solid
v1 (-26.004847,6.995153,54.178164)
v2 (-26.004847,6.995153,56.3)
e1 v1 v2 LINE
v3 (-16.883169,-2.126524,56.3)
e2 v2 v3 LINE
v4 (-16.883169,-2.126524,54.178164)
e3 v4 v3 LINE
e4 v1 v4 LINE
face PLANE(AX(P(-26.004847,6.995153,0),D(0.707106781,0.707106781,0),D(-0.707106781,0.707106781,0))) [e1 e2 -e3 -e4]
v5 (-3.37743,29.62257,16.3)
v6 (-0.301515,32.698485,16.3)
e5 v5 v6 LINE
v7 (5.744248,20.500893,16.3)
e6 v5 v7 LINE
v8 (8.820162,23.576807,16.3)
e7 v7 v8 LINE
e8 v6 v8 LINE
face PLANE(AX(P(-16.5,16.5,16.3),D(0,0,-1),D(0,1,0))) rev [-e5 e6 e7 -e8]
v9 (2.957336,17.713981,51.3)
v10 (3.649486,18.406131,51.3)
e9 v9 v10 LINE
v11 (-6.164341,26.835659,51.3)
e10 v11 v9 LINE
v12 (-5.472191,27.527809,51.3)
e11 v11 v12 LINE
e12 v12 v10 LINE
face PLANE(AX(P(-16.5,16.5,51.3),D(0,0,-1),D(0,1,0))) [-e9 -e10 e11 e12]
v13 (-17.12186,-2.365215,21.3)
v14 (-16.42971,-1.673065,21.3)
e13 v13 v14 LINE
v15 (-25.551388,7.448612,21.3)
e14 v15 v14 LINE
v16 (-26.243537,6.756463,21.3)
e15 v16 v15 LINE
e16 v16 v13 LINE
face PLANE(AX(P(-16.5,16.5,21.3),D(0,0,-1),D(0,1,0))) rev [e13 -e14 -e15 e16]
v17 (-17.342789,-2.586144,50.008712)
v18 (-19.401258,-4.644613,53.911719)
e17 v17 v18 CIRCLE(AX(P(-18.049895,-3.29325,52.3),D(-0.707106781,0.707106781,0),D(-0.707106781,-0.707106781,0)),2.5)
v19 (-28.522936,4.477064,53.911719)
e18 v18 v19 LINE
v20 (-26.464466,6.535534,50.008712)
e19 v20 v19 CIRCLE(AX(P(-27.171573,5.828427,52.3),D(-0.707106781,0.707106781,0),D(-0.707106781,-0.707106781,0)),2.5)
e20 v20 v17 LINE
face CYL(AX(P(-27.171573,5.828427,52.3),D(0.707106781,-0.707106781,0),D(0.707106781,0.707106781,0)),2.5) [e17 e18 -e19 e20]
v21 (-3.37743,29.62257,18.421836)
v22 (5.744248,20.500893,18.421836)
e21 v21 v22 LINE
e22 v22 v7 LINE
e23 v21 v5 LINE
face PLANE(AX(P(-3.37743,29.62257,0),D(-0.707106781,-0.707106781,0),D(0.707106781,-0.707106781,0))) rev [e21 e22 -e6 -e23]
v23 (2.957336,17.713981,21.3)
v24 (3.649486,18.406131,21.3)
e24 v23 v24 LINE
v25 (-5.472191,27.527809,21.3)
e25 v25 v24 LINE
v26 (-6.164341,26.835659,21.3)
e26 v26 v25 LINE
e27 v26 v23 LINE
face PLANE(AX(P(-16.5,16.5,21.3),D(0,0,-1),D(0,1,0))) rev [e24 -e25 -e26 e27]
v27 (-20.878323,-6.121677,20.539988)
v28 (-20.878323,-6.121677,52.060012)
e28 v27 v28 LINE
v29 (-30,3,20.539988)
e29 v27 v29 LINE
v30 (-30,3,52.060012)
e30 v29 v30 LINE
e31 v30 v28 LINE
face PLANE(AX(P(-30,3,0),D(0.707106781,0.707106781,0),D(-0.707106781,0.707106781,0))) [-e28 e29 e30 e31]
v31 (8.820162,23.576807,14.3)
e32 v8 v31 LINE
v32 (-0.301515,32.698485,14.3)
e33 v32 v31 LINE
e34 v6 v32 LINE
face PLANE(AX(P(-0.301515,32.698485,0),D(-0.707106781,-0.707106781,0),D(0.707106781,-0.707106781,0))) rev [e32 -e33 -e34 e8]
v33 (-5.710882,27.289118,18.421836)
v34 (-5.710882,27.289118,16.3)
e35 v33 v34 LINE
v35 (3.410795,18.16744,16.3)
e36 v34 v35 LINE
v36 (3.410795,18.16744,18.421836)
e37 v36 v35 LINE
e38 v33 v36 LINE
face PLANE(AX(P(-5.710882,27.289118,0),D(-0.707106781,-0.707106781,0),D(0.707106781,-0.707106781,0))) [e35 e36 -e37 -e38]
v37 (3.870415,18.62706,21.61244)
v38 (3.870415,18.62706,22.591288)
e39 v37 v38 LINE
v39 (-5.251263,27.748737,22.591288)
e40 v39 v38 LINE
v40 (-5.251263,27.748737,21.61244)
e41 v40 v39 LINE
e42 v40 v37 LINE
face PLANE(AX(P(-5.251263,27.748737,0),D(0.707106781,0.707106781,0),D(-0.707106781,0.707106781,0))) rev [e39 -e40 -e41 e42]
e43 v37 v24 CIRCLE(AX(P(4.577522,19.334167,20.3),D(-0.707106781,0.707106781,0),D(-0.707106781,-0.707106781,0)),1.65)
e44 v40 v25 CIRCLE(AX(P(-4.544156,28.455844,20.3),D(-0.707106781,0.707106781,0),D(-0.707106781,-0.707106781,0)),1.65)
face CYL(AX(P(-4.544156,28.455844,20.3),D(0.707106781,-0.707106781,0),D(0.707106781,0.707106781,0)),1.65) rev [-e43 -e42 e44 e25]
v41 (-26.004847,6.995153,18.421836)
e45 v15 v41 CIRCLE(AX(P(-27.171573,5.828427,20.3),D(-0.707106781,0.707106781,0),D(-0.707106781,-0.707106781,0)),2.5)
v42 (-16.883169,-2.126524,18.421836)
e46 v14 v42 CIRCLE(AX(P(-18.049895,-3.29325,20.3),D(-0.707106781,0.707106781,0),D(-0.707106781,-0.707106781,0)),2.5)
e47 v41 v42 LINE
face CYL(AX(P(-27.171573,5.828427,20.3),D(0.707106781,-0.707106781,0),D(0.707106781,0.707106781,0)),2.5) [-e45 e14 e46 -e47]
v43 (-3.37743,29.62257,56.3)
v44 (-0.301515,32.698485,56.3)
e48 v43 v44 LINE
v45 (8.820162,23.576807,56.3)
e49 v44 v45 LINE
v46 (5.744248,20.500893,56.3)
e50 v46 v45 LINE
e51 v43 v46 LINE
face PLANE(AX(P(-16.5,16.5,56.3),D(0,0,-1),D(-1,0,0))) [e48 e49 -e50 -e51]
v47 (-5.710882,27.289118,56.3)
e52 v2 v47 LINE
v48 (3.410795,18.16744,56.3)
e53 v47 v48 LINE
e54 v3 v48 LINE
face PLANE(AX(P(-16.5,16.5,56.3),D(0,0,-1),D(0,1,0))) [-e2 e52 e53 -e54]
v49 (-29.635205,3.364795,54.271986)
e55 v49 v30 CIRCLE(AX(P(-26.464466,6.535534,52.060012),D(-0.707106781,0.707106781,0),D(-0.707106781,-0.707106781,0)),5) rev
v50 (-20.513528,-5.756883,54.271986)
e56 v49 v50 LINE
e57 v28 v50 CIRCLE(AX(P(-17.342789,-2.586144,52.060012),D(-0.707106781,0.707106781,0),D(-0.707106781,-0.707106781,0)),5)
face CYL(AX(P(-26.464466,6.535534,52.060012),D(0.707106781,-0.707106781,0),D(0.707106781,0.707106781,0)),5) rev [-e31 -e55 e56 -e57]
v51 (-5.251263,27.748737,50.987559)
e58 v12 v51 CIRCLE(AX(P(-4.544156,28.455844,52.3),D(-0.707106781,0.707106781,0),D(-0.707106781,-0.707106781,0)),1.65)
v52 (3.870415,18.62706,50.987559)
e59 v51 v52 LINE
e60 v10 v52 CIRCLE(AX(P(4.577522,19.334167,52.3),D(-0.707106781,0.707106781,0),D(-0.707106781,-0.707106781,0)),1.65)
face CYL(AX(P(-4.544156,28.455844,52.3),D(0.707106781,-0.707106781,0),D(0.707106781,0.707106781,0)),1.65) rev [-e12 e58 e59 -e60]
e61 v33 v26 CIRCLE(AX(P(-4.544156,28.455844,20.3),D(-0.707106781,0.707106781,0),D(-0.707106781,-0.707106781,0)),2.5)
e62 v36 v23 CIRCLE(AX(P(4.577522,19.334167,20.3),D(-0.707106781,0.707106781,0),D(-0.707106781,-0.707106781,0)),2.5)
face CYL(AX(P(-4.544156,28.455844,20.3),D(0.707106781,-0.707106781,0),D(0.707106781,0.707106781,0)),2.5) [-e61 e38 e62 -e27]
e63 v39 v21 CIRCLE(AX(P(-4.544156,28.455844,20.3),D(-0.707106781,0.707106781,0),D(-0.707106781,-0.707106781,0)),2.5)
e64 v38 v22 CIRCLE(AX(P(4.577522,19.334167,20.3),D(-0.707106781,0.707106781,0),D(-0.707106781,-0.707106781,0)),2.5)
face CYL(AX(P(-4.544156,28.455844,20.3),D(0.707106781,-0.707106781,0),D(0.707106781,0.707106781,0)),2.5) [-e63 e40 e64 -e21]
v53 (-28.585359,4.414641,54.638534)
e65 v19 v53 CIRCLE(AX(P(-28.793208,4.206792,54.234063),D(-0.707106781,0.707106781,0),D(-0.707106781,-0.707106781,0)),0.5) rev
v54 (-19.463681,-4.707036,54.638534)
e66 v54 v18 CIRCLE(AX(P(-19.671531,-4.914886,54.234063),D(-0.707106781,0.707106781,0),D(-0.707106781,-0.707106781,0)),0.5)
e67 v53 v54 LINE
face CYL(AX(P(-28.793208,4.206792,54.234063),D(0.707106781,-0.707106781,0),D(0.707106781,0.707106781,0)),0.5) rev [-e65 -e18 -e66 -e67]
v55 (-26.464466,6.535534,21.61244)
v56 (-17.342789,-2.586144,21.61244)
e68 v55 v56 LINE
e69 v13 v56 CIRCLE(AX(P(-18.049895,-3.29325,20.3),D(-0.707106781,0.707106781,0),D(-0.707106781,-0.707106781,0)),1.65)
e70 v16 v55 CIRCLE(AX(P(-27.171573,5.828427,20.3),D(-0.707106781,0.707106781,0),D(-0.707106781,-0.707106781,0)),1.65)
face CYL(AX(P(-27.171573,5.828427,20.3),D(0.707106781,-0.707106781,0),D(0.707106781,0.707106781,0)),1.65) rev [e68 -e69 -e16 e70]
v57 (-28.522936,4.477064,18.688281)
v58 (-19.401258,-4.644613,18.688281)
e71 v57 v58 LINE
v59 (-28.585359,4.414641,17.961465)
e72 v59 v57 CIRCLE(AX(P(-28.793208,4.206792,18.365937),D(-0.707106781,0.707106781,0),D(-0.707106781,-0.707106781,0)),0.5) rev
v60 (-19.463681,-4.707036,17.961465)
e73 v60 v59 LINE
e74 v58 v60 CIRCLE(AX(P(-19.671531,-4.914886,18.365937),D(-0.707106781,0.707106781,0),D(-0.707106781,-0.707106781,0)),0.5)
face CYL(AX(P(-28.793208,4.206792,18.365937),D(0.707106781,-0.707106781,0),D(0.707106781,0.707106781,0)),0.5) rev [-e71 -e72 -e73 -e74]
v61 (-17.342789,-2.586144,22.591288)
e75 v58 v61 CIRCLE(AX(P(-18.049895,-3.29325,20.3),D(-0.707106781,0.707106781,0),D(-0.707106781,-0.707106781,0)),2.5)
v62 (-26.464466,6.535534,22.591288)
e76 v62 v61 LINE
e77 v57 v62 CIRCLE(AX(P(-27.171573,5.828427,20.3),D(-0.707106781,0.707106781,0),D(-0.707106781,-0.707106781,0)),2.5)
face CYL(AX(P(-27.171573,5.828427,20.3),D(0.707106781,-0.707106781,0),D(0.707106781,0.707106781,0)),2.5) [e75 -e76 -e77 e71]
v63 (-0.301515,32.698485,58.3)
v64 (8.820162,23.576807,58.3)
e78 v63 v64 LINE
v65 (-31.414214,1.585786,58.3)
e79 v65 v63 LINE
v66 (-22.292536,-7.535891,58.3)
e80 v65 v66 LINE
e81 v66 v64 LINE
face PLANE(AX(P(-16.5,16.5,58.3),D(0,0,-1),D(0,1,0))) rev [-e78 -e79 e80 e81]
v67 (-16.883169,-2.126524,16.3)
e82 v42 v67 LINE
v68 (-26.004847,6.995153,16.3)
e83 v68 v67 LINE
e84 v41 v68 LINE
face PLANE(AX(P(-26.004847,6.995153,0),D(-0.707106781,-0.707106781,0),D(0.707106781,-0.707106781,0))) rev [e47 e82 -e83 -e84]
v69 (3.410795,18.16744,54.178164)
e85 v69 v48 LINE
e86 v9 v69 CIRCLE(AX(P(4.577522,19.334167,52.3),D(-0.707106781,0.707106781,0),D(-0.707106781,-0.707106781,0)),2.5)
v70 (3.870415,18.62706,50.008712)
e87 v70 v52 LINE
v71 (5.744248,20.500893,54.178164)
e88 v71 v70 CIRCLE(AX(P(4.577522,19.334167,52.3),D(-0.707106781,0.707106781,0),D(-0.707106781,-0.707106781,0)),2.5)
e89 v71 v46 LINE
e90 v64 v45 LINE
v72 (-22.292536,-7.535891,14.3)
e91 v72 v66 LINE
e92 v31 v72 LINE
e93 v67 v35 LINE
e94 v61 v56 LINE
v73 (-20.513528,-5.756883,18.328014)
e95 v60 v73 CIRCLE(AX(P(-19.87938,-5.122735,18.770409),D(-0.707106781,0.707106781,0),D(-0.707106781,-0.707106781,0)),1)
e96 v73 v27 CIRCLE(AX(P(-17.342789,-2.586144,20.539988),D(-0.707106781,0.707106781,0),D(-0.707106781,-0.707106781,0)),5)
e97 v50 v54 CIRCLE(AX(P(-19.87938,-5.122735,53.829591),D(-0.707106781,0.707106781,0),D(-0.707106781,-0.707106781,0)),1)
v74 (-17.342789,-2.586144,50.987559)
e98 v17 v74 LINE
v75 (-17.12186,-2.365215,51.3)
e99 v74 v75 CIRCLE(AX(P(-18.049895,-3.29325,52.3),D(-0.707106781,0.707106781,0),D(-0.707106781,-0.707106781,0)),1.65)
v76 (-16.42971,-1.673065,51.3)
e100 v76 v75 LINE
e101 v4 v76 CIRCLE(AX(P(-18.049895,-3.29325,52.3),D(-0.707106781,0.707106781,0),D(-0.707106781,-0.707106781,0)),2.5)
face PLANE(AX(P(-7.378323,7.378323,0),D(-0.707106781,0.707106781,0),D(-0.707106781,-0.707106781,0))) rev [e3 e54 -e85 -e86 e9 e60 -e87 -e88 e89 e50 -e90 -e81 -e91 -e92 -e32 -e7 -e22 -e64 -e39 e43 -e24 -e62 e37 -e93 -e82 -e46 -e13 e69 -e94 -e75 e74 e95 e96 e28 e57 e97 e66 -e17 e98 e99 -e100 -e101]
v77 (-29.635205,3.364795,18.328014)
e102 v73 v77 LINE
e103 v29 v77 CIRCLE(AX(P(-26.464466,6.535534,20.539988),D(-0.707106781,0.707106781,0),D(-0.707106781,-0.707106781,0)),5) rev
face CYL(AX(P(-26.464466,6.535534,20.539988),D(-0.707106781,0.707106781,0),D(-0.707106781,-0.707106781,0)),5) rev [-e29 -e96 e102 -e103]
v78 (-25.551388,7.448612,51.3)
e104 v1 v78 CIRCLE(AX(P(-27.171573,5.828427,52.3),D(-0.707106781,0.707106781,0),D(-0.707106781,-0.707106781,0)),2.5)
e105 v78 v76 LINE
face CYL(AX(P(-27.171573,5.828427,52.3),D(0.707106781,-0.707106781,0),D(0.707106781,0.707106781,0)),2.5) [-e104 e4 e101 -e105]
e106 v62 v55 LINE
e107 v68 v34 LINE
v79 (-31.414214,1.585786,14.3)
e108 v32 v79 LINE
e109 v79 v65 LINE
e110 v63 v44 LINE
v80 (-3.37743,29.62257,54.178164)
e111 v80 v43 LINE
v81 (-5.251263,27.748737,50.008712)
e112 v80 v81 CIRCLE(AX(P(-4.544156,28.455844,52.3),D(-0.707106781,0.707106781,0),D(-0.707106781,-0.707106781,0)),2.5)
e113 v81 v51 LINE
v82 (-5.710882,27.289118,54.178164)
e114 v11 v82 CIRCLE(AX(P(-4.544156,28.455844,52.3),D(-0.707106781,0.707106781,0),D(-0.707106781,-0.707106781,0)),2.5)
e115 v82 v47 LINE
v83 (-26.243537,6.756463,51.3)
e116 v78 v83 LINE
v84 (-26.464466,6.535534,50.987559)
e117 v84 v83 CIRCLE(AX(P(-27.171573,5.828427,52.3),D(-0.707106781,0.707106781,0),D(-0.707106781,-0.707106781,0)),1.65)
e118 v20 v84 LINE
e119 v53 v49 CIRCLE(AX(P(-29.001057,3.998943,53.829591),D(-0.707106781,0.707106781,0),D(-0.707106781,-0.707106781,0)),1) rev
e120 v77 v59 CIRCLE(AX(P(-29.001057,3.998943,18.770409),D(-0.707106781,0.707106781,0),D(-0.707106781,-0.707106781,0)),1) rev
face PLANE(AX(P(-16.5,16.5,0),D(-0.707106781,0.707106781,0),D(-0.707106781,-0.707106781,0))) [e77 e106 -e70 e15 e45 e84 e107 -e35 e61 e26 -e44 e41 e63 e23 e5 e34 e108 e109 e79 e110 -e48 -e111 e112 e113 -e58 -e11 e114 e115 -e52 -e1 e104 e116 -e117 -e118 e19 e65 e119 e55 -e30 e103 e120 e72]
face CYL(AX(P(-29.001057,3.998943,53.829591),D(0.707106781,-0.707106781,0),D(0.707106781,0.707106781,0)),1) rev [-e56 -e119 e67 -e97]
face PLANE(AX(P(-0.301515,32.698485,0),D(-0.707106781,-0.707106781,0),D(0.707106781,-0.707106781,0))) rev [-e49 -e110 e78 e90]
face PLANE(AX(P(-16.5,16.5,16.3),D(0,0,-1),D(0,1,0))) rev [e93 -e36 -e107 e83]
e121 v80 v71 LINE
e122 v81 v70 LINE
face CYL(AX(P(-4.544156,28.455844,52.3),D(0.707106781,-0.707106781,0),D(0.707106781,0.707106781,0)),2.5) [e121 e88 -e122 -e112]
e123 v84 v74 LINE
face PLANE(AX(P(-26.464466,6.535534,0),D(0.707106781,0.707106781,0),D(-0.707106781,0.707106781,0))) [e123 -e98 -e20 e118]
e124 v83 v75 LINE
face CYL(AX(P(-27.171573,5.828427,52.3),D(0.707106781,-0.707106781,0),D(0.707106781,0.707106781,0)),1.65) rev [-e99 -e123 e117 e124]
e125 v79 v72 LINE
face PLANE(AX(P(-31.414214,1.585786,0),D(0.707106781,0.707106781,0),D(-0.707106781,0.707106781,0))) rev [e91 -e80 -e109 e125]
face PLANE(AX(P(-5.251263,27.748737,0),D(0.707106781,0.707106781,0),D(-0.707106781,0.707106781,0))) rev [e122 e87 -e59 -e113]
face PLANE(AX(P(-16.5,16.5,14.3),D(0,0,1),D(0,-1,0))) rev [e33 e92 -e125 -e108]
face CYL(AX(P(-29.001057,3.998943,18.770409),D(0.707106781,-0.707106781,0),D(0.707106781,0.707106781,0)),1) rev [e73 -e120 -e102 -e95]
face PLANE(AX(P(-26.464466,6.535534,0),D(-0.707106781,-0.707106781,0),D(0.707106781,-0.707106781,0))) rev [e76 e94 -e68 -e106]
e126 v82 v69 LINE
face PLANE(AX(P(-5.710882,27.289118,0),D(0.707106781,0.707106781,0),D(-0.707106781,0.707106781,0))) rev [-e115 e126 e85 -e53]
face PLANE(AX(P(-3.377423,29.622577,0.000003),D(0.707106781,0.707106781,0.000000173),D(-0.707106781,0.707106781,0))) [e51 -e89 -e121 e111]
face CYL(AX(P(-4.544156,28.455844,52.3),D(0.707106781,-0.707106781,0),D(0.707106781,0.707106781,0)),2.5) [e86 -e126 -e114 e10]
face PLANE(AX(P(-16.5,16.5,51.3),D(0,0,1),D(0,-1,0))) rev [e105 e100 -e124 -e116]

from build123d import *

# Parameters (mm, degrees)
BOSS_EXTRUDE1_DEPTH = 12.9
FILLET1_R           = 5
FILLET2_R           = 1
FILLET3_R           = 0.5


with BuildPart() as part:
    # Sketch2 → Boss-Extrude1 (new body)
    with BuildSketch(Plane(origin=(-7.378322523, 7.378322523, 0), x_dir=(0, 0, 1), z_dir=(-0.7071067811865452, 0.7071067811865498, 0))):
        with BuildLine():
            Line((56.29999994, -16.741883092), (56.29999994, -19.091883092))
            Line((56.29999994, -19.091883092), (16.29999994, -19.091883092))
            Line((16.29999994, -19.091883092), (16.29999994, -16.741883092))
            Line((16.29999994, -16.741883092), (18.421835943, -16.741883092))
            ThreePointArc((18.421835943, -16.741883092), (21.641004351, -17.201790003), (22.591287788, -14.091883092))
            Line((22.591287788, -14.091883092), (22.29999994, -14.091883092))
            Line((22.29999994, -14.091883092), (21.612440415, -14.091883092))
            ThreePointArc((21.612440415, -14.091883092), (21.863334003, -14.564164788), (21.94999994, -15.091883092))
            ThreePointArc((21.94999994, -15.091883092), (18.821402632, -15.824174018), (21.29999994, -13.779442617))
            Line((21.29999994, -13.779442617), (21.29999994, -13.091883092))
            Line((21.29999994, -13.091883092), (21.29999994, -12.800595245))
            ThreePointArc((21.29999994, -12.800595245), (19.756303769, -12.651720296), (18.421835943, -13.441883092))
            Line((18.421835943, -13.441883092), (16.29999994, -13.441883092))
            Line((16.29999994, -13.441883092), (16.29999994, 15.258116908))
            Line((16.29999994, 15.258116908), (18.421835943, 15.258116908))
            ThreePointArc((18.421835943, 15.258116908), (19.756303769, 14.467954112), (21.29999994, 14.61682906))
            Line((21.29999994, 14.61682906), (21.29999994, 14.908116908))
            Line((21.29999994, 14.908116908), (21.29999994, 15.595676433))
            ThreePointArc((21.29999994, 15.595676433), (18.821402632, 17.640407834), (21.94999994, 16.908116908))
            ThreePointArc((21.94999994, 16.908116908), (21.863334003, 16.380398604), (21.612440415, 15.908116908))
            Line((21.612440415, 15.908116908), (22.29999994, 15.908116908))
            Line((22.29999994, 15.908116908), (22.591287788, 15.908116908))
            ThreePointArc((22.591287788, 15.908116908), (21.641004351, 19.018023818), (18.421835943, 18.558116908))
            Line((18.421835943, 18.558116908), (16.29999994, 18.558116908))
            Line((16.29999994, 18.558116908), (16.29999994, 22.908116908))
            Line((16.29999994, 22.908116908), (14.29999994, 22.908116908))
            Line((14.29999994, 22.908116908), (14.29999994, -21.091883092))
            Line((14.29999994, -21.091883092), (58.29999994, -21.091883092))
            Line((58.29999994, -21.091883092), (58.29999994, 22.908116908))
            Line((58.29999994, 22.908116908), (56.29999994, 22.908116908))
            Line((56.29999994, 22.908116908), (56.29999994, 18.558116541))
            Line((56.29999994, 18.558116541), (54.178163937, 18.558116908))
            ThreePointArc((54.178163937, 18.558116908), (50.95899553, 19.018023818), (50.008712093, 15.908116908))
            Line((50.008712093, 15.908116908), (50.29999994, 15.908116908))
            Line((50.29999994, 15.908116908), (50.987559466, 15.908116908))
            ThreePointArc((50.987559466, 15.908116908), (51.772281637, 18.471450971), (53.94999994, 16.908116908))
            ThreePointArc((53.94999994, 16.908116908), (53.032290866, 15.4295196), (51.29999994, 15.595676433))
            Line((51.29999994, 15.595676433), (51.29999994, 14.908116908))
            Line((51.29999994, 14.908116908), (51.29999994, 14.61682906))
            ThreePointArc((51.29999994, 14.61682906), (52.843696112, 14.467954112), (54.178163937, 15.258116908))
            Line((54.178163937, 15.258116908), (56.29999994, 15.258116908))
            Line((56.29999994, 15.258116908), (56.29999994, -13.441883092))
            Line((56.29999994, -13.441883092), (54.178163937, -13.441883092))
            ThreePointArc((54.178163937, -13.441883092), (52.843696112, -12.651720296), (51.29999994, -12.800595245))
            Line((51.29999994, -12.800595245), (51.29999994, -13.091883092))
            Line((51.29999994, -13.091883092), (51.29999994, -13.779442617))
            ThreePointArc((51.29999994, -13.779442617), (53.032290866, -13.613285784), (53.94999994, -15.091883092))
            ThreePointArc((53.94999994, -15.091883092), (51.772281637, -16.655217155), (50.987559466, -14.091883092))
            Line((50.987559466, -14.091883092), (50.29999994, -14.091883092))
            Line((50.29999994, -14.091883092), (50.008712093, -14.091883092))
            ThreePointArc((50.008712093, -14.091883092), (50.95899553, -17.201790003), (54.178163937, -16.741883092))
            Line((54.178163937, -16.741883092), (56.29999994, -16.741883092))
        make_face()
    extrude(amount=BOSS_EXTRUDE1_DEPTH)

    # Fillet1
    # the kernel refuses this fillet: 5 mm, written as the material it adds along each edge
    with BuildSketch(Plane(origin=(-20.878322523, -6.121677477, 56.29999994), x_dir=(0, 0, -1), z_dir=(-0.7071067811865452, 0.7071067811865498, 0))) as fillet1_piece_1:
        with BuildLine():
            CenterArc((4.239988208, -5), FILLET1_R, 90, 57.994545172)
            Line((0, -2.35), (-0.084799764, -2.297))
            ThreePointArc((-0.084799764, -2.297), (-0.1, -1.175), (-0.1, 0))
            Line((-0.1, 0), (0, 0.1))
            Line((0, 0.1), (4.239988208, 0.1))
            Line((4.239988208, 0.1), (4.239988208, 0))
        make_face()
    extrude(amount=12.9)
    with BuildSketch(Plane(origin=(-20.878322523, -6.121677477, 16.29999994), x_dir=(0.7071067811865498, 0.7071067811865452, 4.67144053935759e-13), z_dir=(-0.7071067811865452, 0.7071067811865498, 0))) as fillet1_piece_2:
        with BuildLine():
            CenterArc((5, -4.239988208), FILLET1_R, 122.005454828, 57.994545172)
            Line((0, -4.239988208), (-0.1, -4.239988208))
            Line((-0.1, -4.239988208), (-0.1, 0))
            Line((-0.1, 0), (0, 0.1))
            ThreePointArc((0, 0.1), (1.175, 0.1), (2.297, 0.084799764))
            Line((2.297, 0.084799764), (2.35, 0))
        make_face()
    extrude(amount=12.9)

    # Fillet2
    # the kernel refuses this fillet: 1 mm, written as the material it adds along each edge
    with BuildSketch(Plane(origin=(-19.216621587, -4.459976542, 16.29999994), x_dir=(-0.4742981469837023, -0.4742981469836992, 0.7416754920689071), z_dir=(-0.7071067811865452, 0.7071067811865498, 0))) as fillet2_piece_1:
        with BuildLine():
            CenterArc((2.460931793, 0.961889952), FILLET2_R, 152.5257211, 133.343162112)
            Line((1.573713762, 1.423240324), (1.555969401, 1.432467331))
            ThreePointArc((1.555969401, 1.432467331), (0.773441703, 0.726453672), (-0.013415177, 0.01483351))
            Line((-0.013415177, 0.01483351), (-0.005468737, -0.019237799))
            ThreePointArc((-0.005468737, -0.019237799), (1.367184329, -0.210550238), (2.739837396, -0.019237799))
            Line((2.739837396, -0.019237799), (2.734368658, 0))
        make_face()
    extrude(amount=12.9)
    with BuildSketch(Plane(origin=(-19.216621587, -4.459976542, 56.29999994), x_dir=(-0.47429814698388373, -0.4742981469838806, -0.7416754920686752), z_dir=(-0.7071067811865452, 0.7071067811865498, 0))) as fillet2_piece_2:
        with BuildLine():
            CenterArc((2.460931793, -0.961889952), FILLET2_R, 74.131116788, 133.343162112)
            Line((1.573713762, -1.423240324), (1.555969401, -1.432467331))
            ThreePointArc((1.555969401, -1.432467331), (0.773441703, -0.726453672), (-0.013415177, -0.01483351))
            Line((-0.013415177, -0.01483351), (-0.005468737, 0.019237799))
            ThreePointArc((-0.005468737, 0.019237799), (1.367184329, 0.210550238), (2.739837396, 0.019237799))
            Line((2.739837396, 0.019237799), (2.734368658, 0))
        make_face()
    extrude(amount=12.9)

    # Fillet3
    fillet3_edges = [part.edges().sort_by_distance(p)[0] for p in [
        (-23.777460326, 0.100862197, 18.421835943),
        (-23.777460326, 0.100862197, 54.178163937),
    ]]
    fillet(fillet3_edges, radius=FILLET3_R)


solid = part.part
